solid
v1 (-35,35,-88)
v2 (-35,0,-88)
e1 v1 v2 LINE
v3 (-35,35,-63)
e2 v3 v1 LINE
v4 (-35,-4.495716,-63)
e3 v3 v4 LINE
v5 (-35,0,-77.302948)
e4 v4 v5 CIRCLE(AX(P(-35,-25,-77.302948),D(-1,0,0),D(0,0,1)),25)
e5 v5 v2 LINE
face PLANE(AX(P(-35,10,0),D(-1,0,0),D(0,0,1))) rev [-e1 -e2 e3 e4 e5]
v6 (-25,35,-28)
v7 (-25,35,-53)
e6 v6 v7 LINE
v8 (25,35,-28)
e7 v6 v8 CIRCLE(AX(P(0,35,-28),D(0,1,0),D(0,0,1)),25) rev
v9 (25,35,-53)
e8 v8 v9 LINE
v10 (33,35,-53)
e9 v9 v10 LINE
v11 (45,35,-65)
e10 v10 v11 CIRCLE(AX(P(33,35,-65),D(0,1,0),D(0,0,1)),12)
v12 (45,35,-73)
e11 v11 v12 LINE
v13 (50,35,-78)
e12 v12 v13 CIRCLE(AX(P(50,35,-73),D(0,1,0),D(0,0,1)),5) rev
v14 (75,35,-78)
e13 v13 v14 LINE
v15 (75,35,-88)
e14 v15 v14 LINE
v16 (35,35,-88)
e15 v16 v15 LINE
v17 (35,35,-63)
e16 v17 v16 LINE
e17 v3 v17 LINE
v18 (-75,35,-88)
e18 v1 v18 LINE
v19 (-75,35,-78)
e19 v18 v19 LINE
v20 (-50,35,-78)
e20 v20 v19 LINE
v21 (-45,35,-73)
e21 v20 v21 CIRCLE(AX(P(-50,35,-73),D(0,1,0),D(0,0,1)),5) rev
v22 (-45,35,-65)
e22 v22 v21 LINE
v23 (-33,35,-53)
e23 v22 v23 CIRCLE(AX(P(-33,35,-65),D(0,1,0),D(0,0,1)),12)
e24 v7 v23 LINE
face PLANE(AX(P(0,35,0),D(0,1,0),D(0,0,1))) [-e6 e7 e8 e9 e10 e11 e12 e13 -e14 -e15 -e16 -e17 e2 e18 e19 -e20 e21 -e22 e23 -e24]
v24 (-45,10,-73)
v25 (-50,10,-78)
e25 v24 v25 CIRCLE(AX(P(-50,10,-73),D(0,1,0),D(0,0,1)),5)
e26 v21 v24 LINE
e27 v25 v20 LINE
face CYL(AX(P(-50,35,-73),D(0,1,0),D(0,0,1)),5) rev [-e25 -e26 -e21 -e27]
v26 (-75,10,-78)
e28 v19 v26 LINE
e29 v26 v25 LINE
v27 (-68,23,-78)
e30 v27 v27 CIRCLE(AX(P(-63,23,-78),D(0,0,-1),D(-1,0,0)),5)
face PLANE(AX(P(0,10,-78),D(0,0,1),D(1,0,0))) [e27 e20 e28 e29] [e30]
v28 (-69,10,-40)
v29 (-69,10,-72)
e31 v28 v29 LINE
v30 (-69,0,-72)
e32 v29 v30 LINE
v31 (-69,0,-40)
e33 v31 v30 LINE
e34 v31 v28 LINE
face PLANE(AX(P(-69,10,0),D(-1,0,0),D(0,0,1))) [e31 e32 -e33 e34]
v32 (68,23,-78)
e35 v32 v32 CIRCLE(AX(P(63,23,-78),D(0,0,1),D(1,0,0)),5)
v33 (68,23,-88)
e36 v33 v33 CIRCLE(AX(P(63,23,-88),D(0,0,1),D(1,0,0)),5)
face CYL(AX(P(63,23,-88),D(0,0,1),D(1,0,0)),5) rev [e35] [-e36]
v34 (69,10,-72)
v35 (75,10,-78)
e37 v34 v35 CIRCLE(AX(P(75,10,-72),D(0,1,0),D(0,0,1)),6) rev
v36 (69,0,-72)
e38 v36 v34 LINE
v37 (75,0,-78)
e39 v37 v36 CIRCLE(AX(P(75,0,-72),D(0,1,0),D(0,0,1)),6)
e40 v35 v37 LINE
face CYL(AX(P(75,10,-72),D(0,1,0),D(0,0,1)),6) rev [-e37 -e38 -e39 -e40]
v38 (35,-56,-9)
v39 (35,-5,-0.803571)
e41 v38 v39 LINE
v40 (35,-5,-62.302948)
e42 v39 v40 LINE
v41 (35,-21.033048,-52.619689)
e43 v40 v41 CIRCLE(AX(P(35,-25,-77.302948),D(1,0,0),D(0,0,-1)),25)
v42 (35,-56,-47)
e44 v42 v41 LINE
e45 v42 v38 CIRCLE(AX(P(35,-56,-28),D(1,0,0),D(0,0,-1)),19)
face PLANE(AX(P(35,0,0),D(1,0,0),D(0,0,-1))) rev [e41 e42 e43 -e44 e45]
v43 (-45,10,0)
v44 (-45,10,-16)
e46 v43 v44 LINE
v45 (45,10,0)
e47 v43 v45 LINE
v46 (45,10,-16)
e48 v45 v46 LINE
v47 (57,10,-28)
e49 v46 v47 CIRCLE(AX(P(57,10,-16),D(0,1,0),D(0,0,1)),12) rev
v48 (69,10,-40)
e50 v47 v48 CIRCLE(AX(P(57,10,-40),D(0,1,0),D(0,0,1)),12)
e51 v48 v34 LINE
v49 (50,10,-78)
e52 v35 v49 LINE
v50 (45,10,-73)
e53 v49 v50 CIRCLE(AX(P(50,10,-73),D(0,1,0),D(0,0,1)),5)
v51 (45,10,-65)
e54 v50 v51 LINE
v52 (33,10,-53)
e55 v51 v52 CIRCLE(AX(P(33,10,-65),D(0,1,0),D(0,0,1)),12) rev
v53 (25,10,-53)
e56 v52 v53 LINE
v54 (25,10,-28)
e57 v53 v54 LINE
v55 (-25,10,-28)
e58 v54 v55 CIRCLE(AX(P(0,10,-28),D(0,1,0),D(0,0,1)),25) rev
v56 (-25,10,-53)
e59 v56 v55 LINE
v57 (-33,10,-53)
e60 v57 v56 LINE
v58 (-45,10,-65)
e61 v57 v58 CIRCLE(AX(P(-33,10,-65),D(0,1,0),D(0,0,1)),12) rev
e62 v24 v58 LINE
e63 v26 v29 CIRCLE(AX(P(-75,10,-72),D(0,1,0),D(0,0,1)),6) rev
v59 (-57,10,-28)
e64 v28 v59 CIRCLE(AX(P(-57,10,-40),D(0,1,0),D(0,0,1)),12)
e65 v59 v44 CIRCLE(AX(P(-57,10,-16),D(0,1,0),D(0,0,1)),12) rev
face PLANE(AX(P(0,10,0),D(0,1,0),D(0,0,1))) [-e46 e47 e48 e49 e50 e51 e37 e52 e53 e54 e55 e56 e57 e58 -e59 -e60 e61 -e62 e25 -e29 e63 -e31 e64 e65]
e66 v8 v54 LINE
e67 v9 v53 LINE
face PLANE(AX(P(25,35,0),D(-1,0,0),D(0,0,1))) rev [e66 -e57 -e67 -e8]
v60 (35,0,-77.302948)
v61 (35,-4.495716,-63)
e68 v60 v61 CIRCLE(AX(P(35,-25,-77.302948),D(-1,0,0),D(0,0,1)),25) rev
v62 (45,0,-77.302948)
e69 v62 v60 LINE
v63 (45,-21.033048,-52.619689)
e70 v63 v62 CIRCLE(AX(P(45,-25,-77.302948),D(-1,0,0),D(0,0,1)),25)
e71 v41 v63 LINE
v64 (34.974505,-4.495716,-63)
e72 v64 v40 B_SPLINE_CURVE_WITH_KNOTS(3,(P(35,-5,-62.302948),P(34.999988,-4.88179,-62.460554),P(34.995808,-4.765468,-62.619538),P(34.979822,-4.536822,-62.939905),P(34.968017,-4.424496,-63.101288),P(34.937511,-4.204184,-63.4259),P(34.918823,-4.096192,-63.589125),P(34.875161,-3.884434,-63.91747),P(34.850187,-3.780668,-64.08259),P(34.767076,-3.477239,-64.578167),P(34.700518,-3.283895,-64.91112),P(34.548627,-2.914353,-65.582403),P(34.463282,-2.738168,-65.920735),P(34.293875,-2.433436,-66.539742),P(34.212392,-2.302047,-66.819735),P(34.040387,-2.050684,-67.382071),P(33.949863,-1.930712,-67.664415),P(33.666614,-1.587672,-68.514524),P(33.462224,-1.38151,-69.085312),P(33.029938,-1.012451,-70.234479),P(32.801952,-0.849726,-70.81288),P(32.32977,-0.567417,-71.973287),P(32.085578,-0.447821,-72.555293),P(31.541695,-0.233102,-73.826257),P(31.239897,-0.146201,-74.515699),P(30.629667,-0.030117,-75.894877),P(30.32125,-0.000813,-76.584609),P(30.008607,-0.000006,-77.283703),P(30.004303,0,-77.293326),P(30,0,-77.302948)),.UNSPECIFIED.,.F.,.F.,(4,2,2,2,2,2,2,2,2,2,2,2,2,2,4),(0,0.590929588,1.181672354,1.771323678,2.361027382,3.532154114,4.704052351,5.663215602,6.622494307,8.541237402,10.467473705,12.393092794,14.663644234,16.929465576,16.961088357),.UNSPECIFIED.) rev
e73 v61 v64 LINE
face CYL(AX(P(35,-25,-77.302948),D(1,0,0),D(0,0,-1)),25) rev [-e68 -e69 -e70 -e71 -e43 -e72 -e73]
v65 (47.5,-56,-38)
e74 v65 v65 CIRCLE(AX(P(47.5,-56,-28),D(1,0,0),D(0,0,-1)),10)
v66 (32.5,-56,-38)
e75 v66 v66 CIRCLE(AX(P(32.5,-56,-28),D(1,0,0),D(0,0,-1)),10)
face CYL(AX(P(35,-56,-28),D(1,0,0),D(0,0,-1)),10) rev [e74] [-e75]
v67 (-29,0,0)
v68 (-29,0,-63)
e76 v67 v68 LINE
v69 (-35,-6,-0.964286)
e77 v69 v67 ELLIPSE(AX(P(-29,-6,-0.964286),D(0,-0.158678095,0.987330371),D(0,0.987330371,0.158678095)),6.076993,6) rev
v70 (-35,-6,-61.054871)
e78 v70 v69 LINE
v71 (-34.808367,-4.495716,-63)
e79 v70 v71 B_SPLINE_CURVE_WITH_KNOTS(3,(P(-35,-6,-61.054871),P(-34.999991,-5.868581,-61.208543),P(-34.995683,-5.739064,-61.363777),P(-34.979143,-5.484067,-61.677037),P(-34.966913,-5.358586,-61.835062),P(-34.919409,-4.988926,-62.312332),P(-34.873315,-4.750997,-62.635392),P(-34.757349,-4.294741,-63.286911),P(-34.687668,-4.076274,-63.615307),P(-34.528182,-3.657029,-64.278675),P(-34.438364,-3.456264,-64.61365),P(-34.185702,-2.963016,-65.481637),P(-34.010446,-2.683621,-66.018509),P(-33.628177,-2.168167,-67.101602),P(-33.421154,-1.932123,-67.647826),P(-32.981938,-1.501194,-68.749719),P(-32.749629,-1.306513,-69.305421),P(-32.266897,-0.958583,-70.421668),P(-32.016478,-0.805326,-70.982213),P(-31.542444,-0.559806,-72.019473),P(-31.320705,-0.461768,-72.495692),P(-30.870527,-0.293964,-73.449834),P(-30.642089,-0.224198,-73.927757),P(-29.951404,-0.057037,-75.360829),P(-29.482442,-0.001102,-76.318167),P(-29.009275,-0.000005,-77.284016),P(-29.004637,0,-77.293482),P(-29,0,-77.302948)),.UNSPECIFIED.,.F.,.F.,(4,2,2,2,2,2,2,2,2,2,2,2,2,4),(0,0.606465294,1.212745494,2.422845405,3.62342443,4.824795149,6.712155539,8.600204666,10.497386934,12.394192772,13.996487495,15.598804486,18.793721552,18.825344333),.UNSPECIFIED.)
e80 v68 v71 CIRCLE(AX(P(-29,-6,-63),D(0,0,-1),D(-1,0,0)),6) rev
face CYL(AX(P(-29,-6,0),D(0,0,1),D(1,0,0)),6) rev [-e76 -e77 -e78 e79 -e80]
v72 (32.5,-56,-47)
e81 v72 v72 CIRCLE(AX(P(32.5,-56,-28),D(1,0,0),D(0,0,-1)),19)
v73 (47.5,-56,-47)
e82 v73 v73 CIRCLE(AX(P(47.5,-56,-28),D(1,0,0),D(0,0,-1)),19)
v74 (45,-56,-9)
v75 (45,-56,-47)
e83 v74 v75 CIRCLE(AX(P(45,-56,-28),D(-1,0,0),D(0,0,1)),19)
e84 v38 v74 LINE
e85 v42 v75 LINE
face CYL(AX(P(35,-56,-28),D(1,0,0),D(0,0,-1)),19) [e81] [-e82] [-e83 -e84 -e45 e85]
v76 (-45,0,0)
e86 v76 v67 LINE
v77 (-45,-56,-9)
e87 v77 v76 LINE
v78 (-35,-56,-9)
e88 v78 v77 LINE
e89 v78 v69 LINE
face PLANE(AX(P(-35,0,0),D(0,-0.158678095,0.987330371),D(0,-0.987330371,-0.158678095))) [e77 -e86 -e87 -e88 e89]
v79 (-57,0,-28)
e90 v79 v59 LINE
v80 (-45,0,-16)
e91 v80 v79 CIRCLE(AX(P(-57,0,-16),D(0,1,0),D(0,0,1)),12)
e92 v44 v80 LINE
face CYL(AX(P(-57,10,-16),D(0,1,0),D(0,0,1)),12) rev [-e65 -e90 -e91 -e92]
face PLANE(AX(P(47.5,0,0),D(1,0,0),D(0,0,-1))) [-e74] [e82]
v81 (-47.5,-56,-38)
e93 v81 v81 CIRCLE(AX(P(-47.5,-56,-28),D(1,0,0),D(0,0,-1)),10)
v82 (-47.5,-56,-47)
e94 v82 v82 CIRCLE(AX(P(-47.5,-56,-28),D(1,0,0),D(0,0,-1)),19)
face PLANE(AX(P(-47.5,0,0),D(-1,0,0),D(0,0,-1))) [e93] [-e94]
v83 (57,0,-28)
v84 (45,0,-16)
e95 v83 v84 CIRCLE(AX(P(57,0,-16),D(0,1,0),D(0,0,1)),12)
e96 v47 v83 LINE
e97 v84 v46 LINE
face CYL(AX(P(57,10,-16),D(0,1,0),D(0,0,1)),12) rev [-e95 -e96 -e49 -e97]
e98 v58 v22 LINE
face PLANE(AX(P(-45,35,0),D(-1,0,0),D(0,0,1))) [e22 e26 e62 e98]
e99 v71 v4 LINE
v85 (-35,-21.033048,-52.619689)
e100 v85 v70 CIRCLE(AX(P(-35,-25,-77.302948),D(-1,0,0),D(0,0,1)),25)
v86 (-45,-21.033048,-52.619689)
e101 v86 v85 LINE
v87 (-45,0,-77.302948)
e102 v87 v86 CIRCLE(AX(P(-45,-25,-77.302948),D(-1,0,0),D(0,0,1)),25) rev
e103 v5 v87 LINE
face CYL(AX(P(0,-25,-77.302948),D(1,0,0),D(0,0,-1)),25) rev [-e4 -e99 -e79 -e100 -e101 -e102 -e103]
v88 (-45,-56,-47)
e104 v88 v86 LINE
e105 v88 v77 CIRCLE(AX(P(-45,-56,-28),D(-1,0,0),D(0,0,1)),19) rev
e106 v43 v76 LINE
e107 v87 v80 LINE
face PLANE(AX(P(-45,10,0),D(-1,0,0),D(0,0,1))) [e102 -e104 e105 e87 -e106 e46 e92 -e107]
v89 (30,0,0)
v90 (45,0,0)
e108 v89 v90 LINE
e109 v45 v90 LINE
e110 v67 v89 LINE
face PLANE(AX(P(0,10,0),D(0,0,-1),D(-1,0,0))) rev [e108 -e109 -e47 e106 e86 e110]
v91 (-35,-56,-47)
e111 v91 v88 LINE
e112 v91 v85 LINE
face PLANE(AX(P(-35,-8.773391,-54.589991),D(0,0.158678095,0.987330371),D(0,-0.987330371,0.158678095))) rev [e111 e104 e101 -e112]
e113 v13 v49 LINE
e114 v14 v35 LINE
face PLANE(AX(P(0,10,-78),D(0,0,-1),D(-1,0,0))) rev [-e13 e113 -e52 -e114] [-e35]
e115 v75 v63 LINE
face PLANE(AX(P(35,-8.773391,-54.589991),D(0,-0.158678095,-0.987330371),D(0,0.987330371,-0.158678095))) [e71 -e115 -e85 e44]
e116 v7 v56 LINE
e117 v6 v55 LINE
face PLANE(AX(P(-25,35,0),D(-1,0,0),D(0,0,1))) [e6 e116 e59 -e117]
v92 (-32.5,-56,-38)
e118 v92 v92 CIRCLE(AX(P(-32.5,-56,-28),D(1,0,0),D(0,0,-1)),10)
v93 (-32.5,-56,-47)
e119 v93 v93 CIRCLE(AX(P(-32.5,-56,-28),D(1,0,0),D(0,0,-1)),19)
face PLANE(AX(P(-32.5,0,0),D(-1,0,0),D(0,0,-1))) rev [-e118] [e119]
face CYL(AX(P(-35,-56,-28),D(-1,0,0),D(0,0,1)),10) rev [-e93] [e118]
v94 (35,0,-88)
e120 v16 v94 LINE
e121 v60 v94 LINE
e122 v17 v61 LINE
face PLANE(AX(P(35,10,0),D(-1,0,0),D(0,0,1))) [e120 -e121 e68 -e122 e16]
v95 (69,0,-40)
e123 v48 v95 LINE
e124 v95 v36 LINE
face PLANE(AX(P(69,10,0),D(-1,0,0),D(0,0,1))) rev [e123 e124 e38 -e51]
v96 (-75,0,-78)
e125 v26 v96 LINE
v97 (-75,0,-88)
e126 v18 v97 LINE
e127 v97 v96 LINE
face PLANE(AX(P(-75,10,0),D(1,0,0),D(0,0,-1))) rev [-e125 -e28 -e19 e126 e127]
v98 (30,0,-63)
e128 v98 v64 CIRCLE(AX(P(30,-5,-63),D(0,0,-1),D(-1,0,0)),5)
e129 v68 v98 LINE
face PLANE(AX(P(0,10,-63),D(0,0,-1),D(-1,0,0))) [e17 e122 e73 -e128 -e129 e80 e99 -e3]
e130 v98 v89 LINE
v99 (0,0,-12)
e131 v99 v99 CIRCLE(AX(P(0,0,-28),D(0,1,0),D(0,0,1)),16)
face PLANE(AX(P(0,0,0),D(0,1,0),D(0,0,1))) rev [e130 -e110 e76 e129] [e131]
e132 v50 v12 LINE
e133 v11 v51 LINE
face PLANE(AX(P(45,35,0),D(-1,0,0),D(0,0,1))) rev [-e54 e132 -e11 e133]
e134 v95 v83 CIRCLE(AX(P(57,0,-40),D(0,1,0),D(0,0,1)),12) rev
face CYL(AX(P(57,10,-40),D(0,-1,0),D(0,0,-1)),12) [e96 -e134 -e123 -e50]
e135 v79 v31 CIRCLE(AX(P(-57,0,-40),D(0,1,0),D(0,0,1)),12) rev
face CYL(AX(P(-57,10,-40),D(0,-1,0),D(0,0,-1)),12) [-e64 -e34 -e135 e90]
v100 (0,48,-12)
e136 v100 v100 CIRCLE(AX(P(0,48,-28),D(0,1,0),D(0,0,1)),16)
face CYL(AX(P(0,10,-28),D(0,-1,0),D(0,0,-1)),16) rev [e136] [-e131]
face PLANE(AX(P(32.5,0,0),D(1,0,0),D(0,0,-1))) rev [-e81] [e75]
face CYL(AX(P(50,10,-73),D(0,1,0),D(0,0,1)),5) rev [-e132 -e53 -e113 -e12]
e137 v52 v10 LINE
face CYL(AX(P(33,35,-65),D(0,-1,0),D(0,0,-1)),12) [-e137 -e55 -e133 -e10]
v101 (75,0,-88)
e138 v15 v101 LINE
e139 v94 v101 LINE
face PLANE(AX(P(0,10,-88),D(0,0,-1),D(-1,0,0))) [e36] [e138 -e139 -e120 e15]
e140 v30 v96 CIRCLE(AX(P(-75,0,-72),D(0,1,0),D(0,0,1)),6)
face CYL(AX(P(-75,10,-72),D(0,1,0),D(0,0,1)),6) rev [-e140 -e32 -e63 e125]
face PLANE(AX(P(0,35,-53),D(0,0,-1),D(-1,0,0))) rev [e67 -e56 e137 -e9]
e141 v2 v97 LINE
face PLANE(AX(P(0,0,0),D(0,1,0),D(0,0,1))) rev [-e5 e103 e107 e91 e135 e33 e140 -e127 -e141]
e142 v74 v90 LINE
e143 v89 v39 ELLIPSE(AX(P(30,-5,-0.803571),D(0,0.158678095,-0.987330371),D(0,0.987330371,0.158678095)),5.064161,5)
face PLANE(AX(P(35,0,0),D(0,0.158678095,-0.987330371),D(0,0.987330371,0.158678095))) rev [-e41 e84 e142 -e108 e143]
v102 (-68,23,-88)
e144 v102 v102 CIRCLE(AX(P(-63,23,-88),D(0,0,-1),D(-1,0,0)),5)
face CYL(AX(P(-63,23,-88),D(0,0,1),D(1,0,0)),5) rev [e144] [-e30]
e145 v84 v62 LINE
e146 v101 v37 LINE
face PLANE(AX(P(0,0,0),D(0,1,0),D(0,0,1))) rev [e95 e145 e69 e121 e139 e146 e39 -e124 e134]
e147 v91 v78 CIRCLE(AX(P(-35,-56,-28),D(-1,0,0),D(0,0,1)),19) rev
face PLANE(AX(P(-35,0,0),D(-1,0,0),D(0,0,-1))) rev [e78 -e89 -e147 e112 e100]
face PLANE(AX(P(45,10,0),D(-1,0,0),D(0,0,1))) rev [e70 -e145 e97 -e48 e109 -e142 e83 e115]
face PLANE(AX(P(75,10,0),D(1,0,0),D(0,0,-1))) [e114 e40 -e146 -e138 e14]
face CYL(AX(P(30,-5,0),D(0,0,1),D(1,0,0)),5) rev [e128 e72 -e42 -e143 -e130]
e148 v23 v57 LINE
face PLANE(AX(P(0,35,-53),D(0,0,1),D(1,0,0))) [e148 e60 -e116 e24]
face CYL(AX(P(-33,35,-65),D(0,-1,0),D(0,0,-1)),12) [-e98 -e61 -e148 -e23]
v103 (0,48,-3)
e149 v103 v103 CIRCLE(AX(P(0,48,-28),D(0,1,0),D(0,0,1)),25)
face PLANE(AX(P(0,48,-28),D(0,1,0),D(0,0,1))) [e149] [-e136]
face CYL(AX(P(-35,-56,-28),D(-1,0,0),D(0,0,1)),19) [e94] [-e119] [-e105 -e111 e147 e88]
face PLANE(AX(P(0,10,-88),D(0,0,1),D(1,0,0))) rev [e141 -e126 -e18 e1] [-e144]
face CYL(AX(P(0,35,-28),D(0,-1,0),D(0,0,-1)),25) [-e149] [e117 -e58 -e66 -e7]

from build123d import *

# Parameters (mm, degrees)
SKETCH1_R           = 25
SKETCH1_R_2         = 16
BOSS_EXTRUDE1_DEPTH = 10
SKETCH1_8_R         = 25
SKETCH1_8_R_2       = 16
BOSS_EXTRUDE3_DEPTH = 35
SKETCH1_9_R         = 25
SKETCH1_9_R_2       = 16
BOSS_EXTRUDE4_DEPTH = 48
SKETCH7_R           = 10
BOSS_EXTRUDE5_DEPTH = 10
BOSS_EXTRUDE6_START = 2.5
SKETCH7_5_R         = 19
SKETCH7_5_R_2       = 10
BOSS_EXTRUDE6_DEPTH = 15
FILLET1_R           = 5
FILLET2_R           = 12
FILLET3_R           = 12
FILLET4_R           = 6
FILLET5_START       = 29.9999999
FILLET5_DEPTH       = 15.0000001
FILLET5_START_2     = 35
FILLET5_2_DEPTH     = 10
FILLET5_START_3     = -64
FILLET5_3_DEPTH     = 63.196428571
FILLET6_R           = 6
FILLET7_START       = -45
FILLET7_DEPTH       = 16
FILLET7_START_2     = -88
FILLET7_2_DEPTH     = 87.035714286
FILLET7_3_DEPTH     = 25
FILLET8_R           = 12
FILLET9_R           = 12
FILLET10_R          = 6
FILLET11_R          = 12
FILLET12_R          = 12
FILLET13_R          = 5
FILLET14_R          = 5
SKETCH11_R          = 5
CUT_EXTRUDE1_DEPTH  = 132.658649545


with BuildPart() as part:
    # Sketch1 → Boss-Extrude1 (new body)
    # profile 1 of 3: a face of its own
    with BuildSketch(Plane(origin=(0, 0, 0), x_dir=(1, 0, 0), z_dir=(0, 1, 0))):
        with BuildLine():
            Line((-45, 28), (-45, 0))
            Line((-45, 0), (45, 0))
            Line((45, 0), (45, 28))
            Line((45, 28), (69, 28))
            Line((69, 28), (69, 78))
            Line((69, 78), (45, 78))
            Line((45, 78), (45, 53))
            Line((45, 53), (25, 53))
            Line((25, 53), (25, 28))
            ThreePointArc((25, 28), (0, 3), (-25, 28))
            Line((-25, 28), (-25, 53))
            Line((-25, 53), (-45, 53))
            Line((-45, 53), (-45, 78))
            Line((-45, 78), (-69, 78))
            Line((-69, 78), (-69, 28))
            Line((-69, 28), (-45, 28))
        make_face()
    # profile 2 of 3: a face of its own
    with BuildSketch(Plane(origin=(0, 0, 0), x_dir=(1, 0, 0), z_dir=(0, 1, 0))):
        with Locations((0, 28)):
            Circle(SKETCH1_R)
        with Locations(Location((0, 28, 0), (0, 0, 270))):
            Circle(SKETCH1_R_2, mode=Mode.SUBTRACT)
    # profile 3 of 3: a face of its own
    with BuildSketch(Plane(origin=(0, 0, 0), x_dir=(1, 0, 0), z_dir=(0, 1, 0))):
        with BuildLine():
            Line((-75, 78), (-69, 78))
            Line((-69, 78), (-45, 78))
            Line((-45, 78), (-45, 53))
            Line((-45, 53), (-25, 53))
            Line((-25, 53), (-25, 28))
            ThreePointArc((-25, 28), (0, 53), (25, 28))
            Line((25, 28), (25, 53))
            Line((25, 53), (45, 53))
            Line((45, 53), (45, 78))
            Line((45, 78), (69, 78))
            Line((69, 78), (75, 78))
            Line((75, 78), (75, 88))
            Line((75, 88), (35, 88))
            Line((35, 88), (35, 63))
            Line((35, 63), (0, 63))
            Line((0, 63), (-35, 63))
            Line((-35, 63), (-35, 88))
            Line((-35, 88), (-75, 88))
            Line((-75, 88), (-75, 78))
        make_face()
    extrude(amount=BOSS_EXTRUDE1_DEPTH)

    # Sketch1<8> → Boss-Extrude3 (add)
    # profile 1 of 2: a face of its own
    with BuildSketch(Plane(origin=(0, 0, 0), x_dir=(1, 0, 0), z_dir=(0, 1, 0))):
        with BuildLine():
            Line((-75, 78), (-69, 78))
            Line((-69, 78), (-45, 78))
            Line((-45, 78), (-45, 53))
            Line((-45, 53), (-25, 53))
            Line((-25, 53), (-25, 28))
            ThreePointArc((-25, 28), (0, 53), (25, 28))
            Line((25, 28), (25, 53))
            Line((25, 53), (45, 53))
            Line((45, 53), (45, 78))
            Line((45, 78), (69, 78))
            Line((69, 78), (75, 78))
            Line((75, 78), (75, 88))
            Line((75, 88), (35, 88))
            Line((35, 88), (35, 63))
            Line((35, 63), (0, 63))
            Line((0, 63), (-35, 63))
            Line((-35, 63), (-35, 88))
            Line((-35, 88), (-75, 88))
            Line((-75, 88), (-75, 78))
        make_face()
    # profile 2 of 2: a face of its own
    with BuildSketch(Plane(origin=(0, 0, 0), x_dir=(1, 0, 0), z_dir=(0, 1, 0))):
        with Locations((0, 28)):
            Circle(SKETCH1_8_R)
        with Locations(Location((0, 28, 0), (0, 0, 270))):
            Circle(SKETCH1_8_R_2, mode=Mode.SUBTRACT)
    extrude(amount=BOSS_EXTRUDE3_DEPTH)

    # Sketch1<9> → Boss-Extrude4 (add)
    with BuildSketch(Plane(origin=(0, 0, 0), x_dir=(1, 0, 0), z_dir=(0, 1, 0))):
        with Locations((0, 28)):
            Circle(SKETCH1_9_R)
        with Locations(Location((0, 28, 0), (0, 0, 270))):
            Circle(SKETCH1_9_R_2, mode=Mode.SUBTRACT)
    extrude(amount=BOSS_EXTRUDE4_DEPTH)

    # Sketch7 → Boss-Extrude5 (add)
    with BuildSketch(Plane(origin=(45, 0, 0), x_dir=(0, 0, -1), z_dir=(1, 0, 0))):
        with BuildLine():
            Line((56, 0), (0, 0))
            Line((0, 0), (9, -56))
            ThreePointArc((9, -56), (28, -75), (47, -56))
            Line((47, -56), (56, 0))
        make_face()
        with Locations((28, -56)):
            Circle(SKETCH7_R, mode=Mode.SUBTRACT)
    boss_extrude5 = extrude(amount=-BOSS_EXTRUDE5_DEPTH)

    # Sketch7<5> → Boss-Extrude6 (add)
    with BuildSketch(Plane(origin=(45, 0, 0), x_dir=(0, 0, -1), z_dir=(1, 0, 0)).offset(BOSS_EXTRUDE6_START)):
        with Locations((28, -56)):
            Circle(SKETCH7_5_R)
        with Locations((28, -56)):
            Circle(SKETCH7_5_R_2, mode=Mode.SUBTRACT)
    boss_extrude6 = extrude(amount=-BOSS_EXTRUDE6_DEPTH)

    # Fillet1
    fillet1_edges = [part.edges().sort_by_distance(p)[0] for p in [
        (35, 0, -28),
    ]]
    fillet(fillet1_edges, radius=FILLET1_R)

    # Fillet2
    fillet2_edges = [part.edges().sort_by_distance(p)[0] for p in [
        (45, 5, -28),
    ]]
    fillet(fillet2_edges, radius=FILLET2_R)

    # Fillet3
    fillet3_edges = [part.edges().sort_by_distance(p)[0] for p in [
        (69, 5, -28),
    ]]
    fillet(fillet3_edges, radius=FILLET3_R - 0.0001)  # a hair under: the kernel refuses the full size

    # Fillet4
    fillet4_edges = [part.edges().sort_by_distance(p)[0] for p in [
        (69, 5, -78),
    ]]
    fillet(fillet4_edges, radius=FILLET4_R - 0.0001)  # a hair under: the kernel refuses the full size

    # Fillet5: read off the stored shape, not the designer's step
    # Fillet5 outline → Fillet5 (add)
    with BuildSketch(Plane.YZ.offset(FILLET5_START)):
        with BuildLine():
            ThreePointArc((-21.033047615, -52.619688776), (-11.709098144, -56.128625688), (-4.495715646, -63))
            Line((-4.495715646, -63), (0, -63))
            Line((0, -63), (0, -56))
            Line((0, -56), (-21.033047615, -52.619688776))
        make_face()
    extrude(amount=FILLET5_DEPTH)

    # Fillet5 2 outline → Fillet5 2 (add)
    with BuildSketch(Plane.YZ.offset(FILLET5_START_2)):
        with BuildLine():
            ThreePointArc((-4.495715646, -63), (-1.150397185, -69.806519203), (0, -77.302948058))
            Line((0, -77.302948058), (0, -63))
            Line((0, -63), (-4.495715646, -63))
        make_face()
    extrude(amount=FILLET5_2_DEPTH)

    # Fillet5 3 outline → Fillet5 3 (cut)
    with BuildSketch(Plane.XY.offset(FILLET5_START_3)):
        with BuildLine():
            Line((29.9999999, -23), (35, -23))
            Line((35, -23), (35, -5))
            ThreePointArc((35, -5), (33.535533906, -1.464466094), (30, 0))
            Line((30, 0), (29.9999999, -23))
        make_face()
    extrude(amount=FILLET5_3_DEPTH, mode=Mode.SUBTRACT)

    # Mirror2: Boss-Extrude5, Boss-Extrude6 across plane
    add(boss_extrude5.mirror(Plane(origin=(0, 0, 0), x_dir=(0, 0, 1), z_dir=(1, 0, 0))))
    add(boss_extrude6.mirror(Plane(origin=(0, 0, 0), x_dir=(0, 0, 1), z_dir=(1, 0, 0))))

    # Fillet6
    fillet6_edges = [part.edges().sort_by_distance(p)[0] for p in [
        (-35, 0, -28),
    ]]
    fillet(fillet6_edges, radius=FILLET6_R)

    # Fillet7: read off the stored shape, not the designer's step
    # Fillet7 outline → Fillet7 (add)
    with BuildSketch(Plane.YZ.offset(FILLET7_START)):
        with BuildLine():
            ThreePointArc((-21.033047615, -52.619688776), (-5.971418739, -61.088352929), (0, -77.302948058))
            Line((0, -77.302948058), (0, -56))
            Line((0, -56), (-21.033047615, -52.619688776))
        make_face()
    extrude(amount=FILLET7_DEPTH)

    # Fillet7 2 outline → Fillet7 2 (cut)
    with BuildSketch(Plane.XY.offset(FILLET7_START_2)):
        with BuildLine():
            Line((-29, -23), (-29, 0))
            ThreePointArc((-29, 0), (-33.242640687, -1.757359313), (-35, -6))
            Line((-35, -6), (-35, -23))
            Line((-35, -23), (-29, -23))
        make_face()
    extrude(amount=FILLET7_2_DEPTH, mode=Mode.SUBTRACT)

    # Fillet7 3 outline → Fillet7 3 (cut)
    with BuildSketch(Plane.XY.offset(FILLET7_START_2)):
        with BuildLine():
            Line((-29, 0), (-35, 0))
            Line((-35, 0), (-35, -6))
            ThreePointArc((-35, -6), (-33.242640687, -1.757359313), (-29, 0))
        make_face()
    extrude(amount=FILLET7_3_DEPTH, mode=Mode.SUBTRACT)

    # Fillet8
    fillet8_edges = [part.edges().sort_by_distance(p)[0] for p in [
        (-45, 5, -28),
    ]]
    fillet(fillet8_edges, radius=FILLET8_R)

    # Fillet9
    fillet9_edges = [part.edges().sort_by_distance(p)[0] for p in [
        (-69, 5, -28),
    ]]
    fillet(fillet9_edges, radius=FILLET9_R - 0.0001)  # a hair under: the kernel refuses the full size

    # Fillet10
    fillet10_edges = [part.edges().sort_by_distance(p)[0] for p in [
        (-69, 5, -78),
    ]]
    fillet(fillet10_edges, radius=FILLET10_R - 0.0001)  # a hair under: the kernel refuses the full size

    # Fillet11
    fillet11_edges = [part.edges().sort_by_distance(p)[0] for p in [
        (45, 22.5, -53),
    ]]
    fillet(fillet11_edges, radius=FILLET11_R)

    # Fillet12
    fillet12_edges = [part.edges().sort_by_distance(p)[0] for p in [
        (-45, 22.5, -53),
    ]]
    fillet(fillet12_edges, radius=FILLET12_R)

    # Fillet13
    fillet13_edges = [part.edges().sort_by_distance(p)[0] for p in [
        (45, 22.5, -78),
    ]]
    fillet(fillet13_edges, radius=FILLET13_R)

    # Fillet14
    fillet14_edges = [part.edges().sort_by_distance(p)[0] for p in [
        (-45, 22.5, -78),
    ]]
    fillet(fillet14_edges, radius=FILLET14_R)

    # Sketch11 → Cut-Extrude1 (cut, through all)
    with BuildSketch(Plane.XY.offset(-78)):
        with Locations((63, 23)):
            Circle(SKETCH11_R)
    cut_extrude1 = extrude(amount=-CUT_EXTRUDE1_DEPTH, mode=Mode.SUBTRACT)

    # Mirror8: Cut-Extrude1 across plane
    add(cut_extrude1.mirror(Plane(origin=(0, 0, 0), x_dir=(0, 0, 1), z_dir=(1, 0, 0))), mode=Mode.SUBTRACT)


solid = part.part
